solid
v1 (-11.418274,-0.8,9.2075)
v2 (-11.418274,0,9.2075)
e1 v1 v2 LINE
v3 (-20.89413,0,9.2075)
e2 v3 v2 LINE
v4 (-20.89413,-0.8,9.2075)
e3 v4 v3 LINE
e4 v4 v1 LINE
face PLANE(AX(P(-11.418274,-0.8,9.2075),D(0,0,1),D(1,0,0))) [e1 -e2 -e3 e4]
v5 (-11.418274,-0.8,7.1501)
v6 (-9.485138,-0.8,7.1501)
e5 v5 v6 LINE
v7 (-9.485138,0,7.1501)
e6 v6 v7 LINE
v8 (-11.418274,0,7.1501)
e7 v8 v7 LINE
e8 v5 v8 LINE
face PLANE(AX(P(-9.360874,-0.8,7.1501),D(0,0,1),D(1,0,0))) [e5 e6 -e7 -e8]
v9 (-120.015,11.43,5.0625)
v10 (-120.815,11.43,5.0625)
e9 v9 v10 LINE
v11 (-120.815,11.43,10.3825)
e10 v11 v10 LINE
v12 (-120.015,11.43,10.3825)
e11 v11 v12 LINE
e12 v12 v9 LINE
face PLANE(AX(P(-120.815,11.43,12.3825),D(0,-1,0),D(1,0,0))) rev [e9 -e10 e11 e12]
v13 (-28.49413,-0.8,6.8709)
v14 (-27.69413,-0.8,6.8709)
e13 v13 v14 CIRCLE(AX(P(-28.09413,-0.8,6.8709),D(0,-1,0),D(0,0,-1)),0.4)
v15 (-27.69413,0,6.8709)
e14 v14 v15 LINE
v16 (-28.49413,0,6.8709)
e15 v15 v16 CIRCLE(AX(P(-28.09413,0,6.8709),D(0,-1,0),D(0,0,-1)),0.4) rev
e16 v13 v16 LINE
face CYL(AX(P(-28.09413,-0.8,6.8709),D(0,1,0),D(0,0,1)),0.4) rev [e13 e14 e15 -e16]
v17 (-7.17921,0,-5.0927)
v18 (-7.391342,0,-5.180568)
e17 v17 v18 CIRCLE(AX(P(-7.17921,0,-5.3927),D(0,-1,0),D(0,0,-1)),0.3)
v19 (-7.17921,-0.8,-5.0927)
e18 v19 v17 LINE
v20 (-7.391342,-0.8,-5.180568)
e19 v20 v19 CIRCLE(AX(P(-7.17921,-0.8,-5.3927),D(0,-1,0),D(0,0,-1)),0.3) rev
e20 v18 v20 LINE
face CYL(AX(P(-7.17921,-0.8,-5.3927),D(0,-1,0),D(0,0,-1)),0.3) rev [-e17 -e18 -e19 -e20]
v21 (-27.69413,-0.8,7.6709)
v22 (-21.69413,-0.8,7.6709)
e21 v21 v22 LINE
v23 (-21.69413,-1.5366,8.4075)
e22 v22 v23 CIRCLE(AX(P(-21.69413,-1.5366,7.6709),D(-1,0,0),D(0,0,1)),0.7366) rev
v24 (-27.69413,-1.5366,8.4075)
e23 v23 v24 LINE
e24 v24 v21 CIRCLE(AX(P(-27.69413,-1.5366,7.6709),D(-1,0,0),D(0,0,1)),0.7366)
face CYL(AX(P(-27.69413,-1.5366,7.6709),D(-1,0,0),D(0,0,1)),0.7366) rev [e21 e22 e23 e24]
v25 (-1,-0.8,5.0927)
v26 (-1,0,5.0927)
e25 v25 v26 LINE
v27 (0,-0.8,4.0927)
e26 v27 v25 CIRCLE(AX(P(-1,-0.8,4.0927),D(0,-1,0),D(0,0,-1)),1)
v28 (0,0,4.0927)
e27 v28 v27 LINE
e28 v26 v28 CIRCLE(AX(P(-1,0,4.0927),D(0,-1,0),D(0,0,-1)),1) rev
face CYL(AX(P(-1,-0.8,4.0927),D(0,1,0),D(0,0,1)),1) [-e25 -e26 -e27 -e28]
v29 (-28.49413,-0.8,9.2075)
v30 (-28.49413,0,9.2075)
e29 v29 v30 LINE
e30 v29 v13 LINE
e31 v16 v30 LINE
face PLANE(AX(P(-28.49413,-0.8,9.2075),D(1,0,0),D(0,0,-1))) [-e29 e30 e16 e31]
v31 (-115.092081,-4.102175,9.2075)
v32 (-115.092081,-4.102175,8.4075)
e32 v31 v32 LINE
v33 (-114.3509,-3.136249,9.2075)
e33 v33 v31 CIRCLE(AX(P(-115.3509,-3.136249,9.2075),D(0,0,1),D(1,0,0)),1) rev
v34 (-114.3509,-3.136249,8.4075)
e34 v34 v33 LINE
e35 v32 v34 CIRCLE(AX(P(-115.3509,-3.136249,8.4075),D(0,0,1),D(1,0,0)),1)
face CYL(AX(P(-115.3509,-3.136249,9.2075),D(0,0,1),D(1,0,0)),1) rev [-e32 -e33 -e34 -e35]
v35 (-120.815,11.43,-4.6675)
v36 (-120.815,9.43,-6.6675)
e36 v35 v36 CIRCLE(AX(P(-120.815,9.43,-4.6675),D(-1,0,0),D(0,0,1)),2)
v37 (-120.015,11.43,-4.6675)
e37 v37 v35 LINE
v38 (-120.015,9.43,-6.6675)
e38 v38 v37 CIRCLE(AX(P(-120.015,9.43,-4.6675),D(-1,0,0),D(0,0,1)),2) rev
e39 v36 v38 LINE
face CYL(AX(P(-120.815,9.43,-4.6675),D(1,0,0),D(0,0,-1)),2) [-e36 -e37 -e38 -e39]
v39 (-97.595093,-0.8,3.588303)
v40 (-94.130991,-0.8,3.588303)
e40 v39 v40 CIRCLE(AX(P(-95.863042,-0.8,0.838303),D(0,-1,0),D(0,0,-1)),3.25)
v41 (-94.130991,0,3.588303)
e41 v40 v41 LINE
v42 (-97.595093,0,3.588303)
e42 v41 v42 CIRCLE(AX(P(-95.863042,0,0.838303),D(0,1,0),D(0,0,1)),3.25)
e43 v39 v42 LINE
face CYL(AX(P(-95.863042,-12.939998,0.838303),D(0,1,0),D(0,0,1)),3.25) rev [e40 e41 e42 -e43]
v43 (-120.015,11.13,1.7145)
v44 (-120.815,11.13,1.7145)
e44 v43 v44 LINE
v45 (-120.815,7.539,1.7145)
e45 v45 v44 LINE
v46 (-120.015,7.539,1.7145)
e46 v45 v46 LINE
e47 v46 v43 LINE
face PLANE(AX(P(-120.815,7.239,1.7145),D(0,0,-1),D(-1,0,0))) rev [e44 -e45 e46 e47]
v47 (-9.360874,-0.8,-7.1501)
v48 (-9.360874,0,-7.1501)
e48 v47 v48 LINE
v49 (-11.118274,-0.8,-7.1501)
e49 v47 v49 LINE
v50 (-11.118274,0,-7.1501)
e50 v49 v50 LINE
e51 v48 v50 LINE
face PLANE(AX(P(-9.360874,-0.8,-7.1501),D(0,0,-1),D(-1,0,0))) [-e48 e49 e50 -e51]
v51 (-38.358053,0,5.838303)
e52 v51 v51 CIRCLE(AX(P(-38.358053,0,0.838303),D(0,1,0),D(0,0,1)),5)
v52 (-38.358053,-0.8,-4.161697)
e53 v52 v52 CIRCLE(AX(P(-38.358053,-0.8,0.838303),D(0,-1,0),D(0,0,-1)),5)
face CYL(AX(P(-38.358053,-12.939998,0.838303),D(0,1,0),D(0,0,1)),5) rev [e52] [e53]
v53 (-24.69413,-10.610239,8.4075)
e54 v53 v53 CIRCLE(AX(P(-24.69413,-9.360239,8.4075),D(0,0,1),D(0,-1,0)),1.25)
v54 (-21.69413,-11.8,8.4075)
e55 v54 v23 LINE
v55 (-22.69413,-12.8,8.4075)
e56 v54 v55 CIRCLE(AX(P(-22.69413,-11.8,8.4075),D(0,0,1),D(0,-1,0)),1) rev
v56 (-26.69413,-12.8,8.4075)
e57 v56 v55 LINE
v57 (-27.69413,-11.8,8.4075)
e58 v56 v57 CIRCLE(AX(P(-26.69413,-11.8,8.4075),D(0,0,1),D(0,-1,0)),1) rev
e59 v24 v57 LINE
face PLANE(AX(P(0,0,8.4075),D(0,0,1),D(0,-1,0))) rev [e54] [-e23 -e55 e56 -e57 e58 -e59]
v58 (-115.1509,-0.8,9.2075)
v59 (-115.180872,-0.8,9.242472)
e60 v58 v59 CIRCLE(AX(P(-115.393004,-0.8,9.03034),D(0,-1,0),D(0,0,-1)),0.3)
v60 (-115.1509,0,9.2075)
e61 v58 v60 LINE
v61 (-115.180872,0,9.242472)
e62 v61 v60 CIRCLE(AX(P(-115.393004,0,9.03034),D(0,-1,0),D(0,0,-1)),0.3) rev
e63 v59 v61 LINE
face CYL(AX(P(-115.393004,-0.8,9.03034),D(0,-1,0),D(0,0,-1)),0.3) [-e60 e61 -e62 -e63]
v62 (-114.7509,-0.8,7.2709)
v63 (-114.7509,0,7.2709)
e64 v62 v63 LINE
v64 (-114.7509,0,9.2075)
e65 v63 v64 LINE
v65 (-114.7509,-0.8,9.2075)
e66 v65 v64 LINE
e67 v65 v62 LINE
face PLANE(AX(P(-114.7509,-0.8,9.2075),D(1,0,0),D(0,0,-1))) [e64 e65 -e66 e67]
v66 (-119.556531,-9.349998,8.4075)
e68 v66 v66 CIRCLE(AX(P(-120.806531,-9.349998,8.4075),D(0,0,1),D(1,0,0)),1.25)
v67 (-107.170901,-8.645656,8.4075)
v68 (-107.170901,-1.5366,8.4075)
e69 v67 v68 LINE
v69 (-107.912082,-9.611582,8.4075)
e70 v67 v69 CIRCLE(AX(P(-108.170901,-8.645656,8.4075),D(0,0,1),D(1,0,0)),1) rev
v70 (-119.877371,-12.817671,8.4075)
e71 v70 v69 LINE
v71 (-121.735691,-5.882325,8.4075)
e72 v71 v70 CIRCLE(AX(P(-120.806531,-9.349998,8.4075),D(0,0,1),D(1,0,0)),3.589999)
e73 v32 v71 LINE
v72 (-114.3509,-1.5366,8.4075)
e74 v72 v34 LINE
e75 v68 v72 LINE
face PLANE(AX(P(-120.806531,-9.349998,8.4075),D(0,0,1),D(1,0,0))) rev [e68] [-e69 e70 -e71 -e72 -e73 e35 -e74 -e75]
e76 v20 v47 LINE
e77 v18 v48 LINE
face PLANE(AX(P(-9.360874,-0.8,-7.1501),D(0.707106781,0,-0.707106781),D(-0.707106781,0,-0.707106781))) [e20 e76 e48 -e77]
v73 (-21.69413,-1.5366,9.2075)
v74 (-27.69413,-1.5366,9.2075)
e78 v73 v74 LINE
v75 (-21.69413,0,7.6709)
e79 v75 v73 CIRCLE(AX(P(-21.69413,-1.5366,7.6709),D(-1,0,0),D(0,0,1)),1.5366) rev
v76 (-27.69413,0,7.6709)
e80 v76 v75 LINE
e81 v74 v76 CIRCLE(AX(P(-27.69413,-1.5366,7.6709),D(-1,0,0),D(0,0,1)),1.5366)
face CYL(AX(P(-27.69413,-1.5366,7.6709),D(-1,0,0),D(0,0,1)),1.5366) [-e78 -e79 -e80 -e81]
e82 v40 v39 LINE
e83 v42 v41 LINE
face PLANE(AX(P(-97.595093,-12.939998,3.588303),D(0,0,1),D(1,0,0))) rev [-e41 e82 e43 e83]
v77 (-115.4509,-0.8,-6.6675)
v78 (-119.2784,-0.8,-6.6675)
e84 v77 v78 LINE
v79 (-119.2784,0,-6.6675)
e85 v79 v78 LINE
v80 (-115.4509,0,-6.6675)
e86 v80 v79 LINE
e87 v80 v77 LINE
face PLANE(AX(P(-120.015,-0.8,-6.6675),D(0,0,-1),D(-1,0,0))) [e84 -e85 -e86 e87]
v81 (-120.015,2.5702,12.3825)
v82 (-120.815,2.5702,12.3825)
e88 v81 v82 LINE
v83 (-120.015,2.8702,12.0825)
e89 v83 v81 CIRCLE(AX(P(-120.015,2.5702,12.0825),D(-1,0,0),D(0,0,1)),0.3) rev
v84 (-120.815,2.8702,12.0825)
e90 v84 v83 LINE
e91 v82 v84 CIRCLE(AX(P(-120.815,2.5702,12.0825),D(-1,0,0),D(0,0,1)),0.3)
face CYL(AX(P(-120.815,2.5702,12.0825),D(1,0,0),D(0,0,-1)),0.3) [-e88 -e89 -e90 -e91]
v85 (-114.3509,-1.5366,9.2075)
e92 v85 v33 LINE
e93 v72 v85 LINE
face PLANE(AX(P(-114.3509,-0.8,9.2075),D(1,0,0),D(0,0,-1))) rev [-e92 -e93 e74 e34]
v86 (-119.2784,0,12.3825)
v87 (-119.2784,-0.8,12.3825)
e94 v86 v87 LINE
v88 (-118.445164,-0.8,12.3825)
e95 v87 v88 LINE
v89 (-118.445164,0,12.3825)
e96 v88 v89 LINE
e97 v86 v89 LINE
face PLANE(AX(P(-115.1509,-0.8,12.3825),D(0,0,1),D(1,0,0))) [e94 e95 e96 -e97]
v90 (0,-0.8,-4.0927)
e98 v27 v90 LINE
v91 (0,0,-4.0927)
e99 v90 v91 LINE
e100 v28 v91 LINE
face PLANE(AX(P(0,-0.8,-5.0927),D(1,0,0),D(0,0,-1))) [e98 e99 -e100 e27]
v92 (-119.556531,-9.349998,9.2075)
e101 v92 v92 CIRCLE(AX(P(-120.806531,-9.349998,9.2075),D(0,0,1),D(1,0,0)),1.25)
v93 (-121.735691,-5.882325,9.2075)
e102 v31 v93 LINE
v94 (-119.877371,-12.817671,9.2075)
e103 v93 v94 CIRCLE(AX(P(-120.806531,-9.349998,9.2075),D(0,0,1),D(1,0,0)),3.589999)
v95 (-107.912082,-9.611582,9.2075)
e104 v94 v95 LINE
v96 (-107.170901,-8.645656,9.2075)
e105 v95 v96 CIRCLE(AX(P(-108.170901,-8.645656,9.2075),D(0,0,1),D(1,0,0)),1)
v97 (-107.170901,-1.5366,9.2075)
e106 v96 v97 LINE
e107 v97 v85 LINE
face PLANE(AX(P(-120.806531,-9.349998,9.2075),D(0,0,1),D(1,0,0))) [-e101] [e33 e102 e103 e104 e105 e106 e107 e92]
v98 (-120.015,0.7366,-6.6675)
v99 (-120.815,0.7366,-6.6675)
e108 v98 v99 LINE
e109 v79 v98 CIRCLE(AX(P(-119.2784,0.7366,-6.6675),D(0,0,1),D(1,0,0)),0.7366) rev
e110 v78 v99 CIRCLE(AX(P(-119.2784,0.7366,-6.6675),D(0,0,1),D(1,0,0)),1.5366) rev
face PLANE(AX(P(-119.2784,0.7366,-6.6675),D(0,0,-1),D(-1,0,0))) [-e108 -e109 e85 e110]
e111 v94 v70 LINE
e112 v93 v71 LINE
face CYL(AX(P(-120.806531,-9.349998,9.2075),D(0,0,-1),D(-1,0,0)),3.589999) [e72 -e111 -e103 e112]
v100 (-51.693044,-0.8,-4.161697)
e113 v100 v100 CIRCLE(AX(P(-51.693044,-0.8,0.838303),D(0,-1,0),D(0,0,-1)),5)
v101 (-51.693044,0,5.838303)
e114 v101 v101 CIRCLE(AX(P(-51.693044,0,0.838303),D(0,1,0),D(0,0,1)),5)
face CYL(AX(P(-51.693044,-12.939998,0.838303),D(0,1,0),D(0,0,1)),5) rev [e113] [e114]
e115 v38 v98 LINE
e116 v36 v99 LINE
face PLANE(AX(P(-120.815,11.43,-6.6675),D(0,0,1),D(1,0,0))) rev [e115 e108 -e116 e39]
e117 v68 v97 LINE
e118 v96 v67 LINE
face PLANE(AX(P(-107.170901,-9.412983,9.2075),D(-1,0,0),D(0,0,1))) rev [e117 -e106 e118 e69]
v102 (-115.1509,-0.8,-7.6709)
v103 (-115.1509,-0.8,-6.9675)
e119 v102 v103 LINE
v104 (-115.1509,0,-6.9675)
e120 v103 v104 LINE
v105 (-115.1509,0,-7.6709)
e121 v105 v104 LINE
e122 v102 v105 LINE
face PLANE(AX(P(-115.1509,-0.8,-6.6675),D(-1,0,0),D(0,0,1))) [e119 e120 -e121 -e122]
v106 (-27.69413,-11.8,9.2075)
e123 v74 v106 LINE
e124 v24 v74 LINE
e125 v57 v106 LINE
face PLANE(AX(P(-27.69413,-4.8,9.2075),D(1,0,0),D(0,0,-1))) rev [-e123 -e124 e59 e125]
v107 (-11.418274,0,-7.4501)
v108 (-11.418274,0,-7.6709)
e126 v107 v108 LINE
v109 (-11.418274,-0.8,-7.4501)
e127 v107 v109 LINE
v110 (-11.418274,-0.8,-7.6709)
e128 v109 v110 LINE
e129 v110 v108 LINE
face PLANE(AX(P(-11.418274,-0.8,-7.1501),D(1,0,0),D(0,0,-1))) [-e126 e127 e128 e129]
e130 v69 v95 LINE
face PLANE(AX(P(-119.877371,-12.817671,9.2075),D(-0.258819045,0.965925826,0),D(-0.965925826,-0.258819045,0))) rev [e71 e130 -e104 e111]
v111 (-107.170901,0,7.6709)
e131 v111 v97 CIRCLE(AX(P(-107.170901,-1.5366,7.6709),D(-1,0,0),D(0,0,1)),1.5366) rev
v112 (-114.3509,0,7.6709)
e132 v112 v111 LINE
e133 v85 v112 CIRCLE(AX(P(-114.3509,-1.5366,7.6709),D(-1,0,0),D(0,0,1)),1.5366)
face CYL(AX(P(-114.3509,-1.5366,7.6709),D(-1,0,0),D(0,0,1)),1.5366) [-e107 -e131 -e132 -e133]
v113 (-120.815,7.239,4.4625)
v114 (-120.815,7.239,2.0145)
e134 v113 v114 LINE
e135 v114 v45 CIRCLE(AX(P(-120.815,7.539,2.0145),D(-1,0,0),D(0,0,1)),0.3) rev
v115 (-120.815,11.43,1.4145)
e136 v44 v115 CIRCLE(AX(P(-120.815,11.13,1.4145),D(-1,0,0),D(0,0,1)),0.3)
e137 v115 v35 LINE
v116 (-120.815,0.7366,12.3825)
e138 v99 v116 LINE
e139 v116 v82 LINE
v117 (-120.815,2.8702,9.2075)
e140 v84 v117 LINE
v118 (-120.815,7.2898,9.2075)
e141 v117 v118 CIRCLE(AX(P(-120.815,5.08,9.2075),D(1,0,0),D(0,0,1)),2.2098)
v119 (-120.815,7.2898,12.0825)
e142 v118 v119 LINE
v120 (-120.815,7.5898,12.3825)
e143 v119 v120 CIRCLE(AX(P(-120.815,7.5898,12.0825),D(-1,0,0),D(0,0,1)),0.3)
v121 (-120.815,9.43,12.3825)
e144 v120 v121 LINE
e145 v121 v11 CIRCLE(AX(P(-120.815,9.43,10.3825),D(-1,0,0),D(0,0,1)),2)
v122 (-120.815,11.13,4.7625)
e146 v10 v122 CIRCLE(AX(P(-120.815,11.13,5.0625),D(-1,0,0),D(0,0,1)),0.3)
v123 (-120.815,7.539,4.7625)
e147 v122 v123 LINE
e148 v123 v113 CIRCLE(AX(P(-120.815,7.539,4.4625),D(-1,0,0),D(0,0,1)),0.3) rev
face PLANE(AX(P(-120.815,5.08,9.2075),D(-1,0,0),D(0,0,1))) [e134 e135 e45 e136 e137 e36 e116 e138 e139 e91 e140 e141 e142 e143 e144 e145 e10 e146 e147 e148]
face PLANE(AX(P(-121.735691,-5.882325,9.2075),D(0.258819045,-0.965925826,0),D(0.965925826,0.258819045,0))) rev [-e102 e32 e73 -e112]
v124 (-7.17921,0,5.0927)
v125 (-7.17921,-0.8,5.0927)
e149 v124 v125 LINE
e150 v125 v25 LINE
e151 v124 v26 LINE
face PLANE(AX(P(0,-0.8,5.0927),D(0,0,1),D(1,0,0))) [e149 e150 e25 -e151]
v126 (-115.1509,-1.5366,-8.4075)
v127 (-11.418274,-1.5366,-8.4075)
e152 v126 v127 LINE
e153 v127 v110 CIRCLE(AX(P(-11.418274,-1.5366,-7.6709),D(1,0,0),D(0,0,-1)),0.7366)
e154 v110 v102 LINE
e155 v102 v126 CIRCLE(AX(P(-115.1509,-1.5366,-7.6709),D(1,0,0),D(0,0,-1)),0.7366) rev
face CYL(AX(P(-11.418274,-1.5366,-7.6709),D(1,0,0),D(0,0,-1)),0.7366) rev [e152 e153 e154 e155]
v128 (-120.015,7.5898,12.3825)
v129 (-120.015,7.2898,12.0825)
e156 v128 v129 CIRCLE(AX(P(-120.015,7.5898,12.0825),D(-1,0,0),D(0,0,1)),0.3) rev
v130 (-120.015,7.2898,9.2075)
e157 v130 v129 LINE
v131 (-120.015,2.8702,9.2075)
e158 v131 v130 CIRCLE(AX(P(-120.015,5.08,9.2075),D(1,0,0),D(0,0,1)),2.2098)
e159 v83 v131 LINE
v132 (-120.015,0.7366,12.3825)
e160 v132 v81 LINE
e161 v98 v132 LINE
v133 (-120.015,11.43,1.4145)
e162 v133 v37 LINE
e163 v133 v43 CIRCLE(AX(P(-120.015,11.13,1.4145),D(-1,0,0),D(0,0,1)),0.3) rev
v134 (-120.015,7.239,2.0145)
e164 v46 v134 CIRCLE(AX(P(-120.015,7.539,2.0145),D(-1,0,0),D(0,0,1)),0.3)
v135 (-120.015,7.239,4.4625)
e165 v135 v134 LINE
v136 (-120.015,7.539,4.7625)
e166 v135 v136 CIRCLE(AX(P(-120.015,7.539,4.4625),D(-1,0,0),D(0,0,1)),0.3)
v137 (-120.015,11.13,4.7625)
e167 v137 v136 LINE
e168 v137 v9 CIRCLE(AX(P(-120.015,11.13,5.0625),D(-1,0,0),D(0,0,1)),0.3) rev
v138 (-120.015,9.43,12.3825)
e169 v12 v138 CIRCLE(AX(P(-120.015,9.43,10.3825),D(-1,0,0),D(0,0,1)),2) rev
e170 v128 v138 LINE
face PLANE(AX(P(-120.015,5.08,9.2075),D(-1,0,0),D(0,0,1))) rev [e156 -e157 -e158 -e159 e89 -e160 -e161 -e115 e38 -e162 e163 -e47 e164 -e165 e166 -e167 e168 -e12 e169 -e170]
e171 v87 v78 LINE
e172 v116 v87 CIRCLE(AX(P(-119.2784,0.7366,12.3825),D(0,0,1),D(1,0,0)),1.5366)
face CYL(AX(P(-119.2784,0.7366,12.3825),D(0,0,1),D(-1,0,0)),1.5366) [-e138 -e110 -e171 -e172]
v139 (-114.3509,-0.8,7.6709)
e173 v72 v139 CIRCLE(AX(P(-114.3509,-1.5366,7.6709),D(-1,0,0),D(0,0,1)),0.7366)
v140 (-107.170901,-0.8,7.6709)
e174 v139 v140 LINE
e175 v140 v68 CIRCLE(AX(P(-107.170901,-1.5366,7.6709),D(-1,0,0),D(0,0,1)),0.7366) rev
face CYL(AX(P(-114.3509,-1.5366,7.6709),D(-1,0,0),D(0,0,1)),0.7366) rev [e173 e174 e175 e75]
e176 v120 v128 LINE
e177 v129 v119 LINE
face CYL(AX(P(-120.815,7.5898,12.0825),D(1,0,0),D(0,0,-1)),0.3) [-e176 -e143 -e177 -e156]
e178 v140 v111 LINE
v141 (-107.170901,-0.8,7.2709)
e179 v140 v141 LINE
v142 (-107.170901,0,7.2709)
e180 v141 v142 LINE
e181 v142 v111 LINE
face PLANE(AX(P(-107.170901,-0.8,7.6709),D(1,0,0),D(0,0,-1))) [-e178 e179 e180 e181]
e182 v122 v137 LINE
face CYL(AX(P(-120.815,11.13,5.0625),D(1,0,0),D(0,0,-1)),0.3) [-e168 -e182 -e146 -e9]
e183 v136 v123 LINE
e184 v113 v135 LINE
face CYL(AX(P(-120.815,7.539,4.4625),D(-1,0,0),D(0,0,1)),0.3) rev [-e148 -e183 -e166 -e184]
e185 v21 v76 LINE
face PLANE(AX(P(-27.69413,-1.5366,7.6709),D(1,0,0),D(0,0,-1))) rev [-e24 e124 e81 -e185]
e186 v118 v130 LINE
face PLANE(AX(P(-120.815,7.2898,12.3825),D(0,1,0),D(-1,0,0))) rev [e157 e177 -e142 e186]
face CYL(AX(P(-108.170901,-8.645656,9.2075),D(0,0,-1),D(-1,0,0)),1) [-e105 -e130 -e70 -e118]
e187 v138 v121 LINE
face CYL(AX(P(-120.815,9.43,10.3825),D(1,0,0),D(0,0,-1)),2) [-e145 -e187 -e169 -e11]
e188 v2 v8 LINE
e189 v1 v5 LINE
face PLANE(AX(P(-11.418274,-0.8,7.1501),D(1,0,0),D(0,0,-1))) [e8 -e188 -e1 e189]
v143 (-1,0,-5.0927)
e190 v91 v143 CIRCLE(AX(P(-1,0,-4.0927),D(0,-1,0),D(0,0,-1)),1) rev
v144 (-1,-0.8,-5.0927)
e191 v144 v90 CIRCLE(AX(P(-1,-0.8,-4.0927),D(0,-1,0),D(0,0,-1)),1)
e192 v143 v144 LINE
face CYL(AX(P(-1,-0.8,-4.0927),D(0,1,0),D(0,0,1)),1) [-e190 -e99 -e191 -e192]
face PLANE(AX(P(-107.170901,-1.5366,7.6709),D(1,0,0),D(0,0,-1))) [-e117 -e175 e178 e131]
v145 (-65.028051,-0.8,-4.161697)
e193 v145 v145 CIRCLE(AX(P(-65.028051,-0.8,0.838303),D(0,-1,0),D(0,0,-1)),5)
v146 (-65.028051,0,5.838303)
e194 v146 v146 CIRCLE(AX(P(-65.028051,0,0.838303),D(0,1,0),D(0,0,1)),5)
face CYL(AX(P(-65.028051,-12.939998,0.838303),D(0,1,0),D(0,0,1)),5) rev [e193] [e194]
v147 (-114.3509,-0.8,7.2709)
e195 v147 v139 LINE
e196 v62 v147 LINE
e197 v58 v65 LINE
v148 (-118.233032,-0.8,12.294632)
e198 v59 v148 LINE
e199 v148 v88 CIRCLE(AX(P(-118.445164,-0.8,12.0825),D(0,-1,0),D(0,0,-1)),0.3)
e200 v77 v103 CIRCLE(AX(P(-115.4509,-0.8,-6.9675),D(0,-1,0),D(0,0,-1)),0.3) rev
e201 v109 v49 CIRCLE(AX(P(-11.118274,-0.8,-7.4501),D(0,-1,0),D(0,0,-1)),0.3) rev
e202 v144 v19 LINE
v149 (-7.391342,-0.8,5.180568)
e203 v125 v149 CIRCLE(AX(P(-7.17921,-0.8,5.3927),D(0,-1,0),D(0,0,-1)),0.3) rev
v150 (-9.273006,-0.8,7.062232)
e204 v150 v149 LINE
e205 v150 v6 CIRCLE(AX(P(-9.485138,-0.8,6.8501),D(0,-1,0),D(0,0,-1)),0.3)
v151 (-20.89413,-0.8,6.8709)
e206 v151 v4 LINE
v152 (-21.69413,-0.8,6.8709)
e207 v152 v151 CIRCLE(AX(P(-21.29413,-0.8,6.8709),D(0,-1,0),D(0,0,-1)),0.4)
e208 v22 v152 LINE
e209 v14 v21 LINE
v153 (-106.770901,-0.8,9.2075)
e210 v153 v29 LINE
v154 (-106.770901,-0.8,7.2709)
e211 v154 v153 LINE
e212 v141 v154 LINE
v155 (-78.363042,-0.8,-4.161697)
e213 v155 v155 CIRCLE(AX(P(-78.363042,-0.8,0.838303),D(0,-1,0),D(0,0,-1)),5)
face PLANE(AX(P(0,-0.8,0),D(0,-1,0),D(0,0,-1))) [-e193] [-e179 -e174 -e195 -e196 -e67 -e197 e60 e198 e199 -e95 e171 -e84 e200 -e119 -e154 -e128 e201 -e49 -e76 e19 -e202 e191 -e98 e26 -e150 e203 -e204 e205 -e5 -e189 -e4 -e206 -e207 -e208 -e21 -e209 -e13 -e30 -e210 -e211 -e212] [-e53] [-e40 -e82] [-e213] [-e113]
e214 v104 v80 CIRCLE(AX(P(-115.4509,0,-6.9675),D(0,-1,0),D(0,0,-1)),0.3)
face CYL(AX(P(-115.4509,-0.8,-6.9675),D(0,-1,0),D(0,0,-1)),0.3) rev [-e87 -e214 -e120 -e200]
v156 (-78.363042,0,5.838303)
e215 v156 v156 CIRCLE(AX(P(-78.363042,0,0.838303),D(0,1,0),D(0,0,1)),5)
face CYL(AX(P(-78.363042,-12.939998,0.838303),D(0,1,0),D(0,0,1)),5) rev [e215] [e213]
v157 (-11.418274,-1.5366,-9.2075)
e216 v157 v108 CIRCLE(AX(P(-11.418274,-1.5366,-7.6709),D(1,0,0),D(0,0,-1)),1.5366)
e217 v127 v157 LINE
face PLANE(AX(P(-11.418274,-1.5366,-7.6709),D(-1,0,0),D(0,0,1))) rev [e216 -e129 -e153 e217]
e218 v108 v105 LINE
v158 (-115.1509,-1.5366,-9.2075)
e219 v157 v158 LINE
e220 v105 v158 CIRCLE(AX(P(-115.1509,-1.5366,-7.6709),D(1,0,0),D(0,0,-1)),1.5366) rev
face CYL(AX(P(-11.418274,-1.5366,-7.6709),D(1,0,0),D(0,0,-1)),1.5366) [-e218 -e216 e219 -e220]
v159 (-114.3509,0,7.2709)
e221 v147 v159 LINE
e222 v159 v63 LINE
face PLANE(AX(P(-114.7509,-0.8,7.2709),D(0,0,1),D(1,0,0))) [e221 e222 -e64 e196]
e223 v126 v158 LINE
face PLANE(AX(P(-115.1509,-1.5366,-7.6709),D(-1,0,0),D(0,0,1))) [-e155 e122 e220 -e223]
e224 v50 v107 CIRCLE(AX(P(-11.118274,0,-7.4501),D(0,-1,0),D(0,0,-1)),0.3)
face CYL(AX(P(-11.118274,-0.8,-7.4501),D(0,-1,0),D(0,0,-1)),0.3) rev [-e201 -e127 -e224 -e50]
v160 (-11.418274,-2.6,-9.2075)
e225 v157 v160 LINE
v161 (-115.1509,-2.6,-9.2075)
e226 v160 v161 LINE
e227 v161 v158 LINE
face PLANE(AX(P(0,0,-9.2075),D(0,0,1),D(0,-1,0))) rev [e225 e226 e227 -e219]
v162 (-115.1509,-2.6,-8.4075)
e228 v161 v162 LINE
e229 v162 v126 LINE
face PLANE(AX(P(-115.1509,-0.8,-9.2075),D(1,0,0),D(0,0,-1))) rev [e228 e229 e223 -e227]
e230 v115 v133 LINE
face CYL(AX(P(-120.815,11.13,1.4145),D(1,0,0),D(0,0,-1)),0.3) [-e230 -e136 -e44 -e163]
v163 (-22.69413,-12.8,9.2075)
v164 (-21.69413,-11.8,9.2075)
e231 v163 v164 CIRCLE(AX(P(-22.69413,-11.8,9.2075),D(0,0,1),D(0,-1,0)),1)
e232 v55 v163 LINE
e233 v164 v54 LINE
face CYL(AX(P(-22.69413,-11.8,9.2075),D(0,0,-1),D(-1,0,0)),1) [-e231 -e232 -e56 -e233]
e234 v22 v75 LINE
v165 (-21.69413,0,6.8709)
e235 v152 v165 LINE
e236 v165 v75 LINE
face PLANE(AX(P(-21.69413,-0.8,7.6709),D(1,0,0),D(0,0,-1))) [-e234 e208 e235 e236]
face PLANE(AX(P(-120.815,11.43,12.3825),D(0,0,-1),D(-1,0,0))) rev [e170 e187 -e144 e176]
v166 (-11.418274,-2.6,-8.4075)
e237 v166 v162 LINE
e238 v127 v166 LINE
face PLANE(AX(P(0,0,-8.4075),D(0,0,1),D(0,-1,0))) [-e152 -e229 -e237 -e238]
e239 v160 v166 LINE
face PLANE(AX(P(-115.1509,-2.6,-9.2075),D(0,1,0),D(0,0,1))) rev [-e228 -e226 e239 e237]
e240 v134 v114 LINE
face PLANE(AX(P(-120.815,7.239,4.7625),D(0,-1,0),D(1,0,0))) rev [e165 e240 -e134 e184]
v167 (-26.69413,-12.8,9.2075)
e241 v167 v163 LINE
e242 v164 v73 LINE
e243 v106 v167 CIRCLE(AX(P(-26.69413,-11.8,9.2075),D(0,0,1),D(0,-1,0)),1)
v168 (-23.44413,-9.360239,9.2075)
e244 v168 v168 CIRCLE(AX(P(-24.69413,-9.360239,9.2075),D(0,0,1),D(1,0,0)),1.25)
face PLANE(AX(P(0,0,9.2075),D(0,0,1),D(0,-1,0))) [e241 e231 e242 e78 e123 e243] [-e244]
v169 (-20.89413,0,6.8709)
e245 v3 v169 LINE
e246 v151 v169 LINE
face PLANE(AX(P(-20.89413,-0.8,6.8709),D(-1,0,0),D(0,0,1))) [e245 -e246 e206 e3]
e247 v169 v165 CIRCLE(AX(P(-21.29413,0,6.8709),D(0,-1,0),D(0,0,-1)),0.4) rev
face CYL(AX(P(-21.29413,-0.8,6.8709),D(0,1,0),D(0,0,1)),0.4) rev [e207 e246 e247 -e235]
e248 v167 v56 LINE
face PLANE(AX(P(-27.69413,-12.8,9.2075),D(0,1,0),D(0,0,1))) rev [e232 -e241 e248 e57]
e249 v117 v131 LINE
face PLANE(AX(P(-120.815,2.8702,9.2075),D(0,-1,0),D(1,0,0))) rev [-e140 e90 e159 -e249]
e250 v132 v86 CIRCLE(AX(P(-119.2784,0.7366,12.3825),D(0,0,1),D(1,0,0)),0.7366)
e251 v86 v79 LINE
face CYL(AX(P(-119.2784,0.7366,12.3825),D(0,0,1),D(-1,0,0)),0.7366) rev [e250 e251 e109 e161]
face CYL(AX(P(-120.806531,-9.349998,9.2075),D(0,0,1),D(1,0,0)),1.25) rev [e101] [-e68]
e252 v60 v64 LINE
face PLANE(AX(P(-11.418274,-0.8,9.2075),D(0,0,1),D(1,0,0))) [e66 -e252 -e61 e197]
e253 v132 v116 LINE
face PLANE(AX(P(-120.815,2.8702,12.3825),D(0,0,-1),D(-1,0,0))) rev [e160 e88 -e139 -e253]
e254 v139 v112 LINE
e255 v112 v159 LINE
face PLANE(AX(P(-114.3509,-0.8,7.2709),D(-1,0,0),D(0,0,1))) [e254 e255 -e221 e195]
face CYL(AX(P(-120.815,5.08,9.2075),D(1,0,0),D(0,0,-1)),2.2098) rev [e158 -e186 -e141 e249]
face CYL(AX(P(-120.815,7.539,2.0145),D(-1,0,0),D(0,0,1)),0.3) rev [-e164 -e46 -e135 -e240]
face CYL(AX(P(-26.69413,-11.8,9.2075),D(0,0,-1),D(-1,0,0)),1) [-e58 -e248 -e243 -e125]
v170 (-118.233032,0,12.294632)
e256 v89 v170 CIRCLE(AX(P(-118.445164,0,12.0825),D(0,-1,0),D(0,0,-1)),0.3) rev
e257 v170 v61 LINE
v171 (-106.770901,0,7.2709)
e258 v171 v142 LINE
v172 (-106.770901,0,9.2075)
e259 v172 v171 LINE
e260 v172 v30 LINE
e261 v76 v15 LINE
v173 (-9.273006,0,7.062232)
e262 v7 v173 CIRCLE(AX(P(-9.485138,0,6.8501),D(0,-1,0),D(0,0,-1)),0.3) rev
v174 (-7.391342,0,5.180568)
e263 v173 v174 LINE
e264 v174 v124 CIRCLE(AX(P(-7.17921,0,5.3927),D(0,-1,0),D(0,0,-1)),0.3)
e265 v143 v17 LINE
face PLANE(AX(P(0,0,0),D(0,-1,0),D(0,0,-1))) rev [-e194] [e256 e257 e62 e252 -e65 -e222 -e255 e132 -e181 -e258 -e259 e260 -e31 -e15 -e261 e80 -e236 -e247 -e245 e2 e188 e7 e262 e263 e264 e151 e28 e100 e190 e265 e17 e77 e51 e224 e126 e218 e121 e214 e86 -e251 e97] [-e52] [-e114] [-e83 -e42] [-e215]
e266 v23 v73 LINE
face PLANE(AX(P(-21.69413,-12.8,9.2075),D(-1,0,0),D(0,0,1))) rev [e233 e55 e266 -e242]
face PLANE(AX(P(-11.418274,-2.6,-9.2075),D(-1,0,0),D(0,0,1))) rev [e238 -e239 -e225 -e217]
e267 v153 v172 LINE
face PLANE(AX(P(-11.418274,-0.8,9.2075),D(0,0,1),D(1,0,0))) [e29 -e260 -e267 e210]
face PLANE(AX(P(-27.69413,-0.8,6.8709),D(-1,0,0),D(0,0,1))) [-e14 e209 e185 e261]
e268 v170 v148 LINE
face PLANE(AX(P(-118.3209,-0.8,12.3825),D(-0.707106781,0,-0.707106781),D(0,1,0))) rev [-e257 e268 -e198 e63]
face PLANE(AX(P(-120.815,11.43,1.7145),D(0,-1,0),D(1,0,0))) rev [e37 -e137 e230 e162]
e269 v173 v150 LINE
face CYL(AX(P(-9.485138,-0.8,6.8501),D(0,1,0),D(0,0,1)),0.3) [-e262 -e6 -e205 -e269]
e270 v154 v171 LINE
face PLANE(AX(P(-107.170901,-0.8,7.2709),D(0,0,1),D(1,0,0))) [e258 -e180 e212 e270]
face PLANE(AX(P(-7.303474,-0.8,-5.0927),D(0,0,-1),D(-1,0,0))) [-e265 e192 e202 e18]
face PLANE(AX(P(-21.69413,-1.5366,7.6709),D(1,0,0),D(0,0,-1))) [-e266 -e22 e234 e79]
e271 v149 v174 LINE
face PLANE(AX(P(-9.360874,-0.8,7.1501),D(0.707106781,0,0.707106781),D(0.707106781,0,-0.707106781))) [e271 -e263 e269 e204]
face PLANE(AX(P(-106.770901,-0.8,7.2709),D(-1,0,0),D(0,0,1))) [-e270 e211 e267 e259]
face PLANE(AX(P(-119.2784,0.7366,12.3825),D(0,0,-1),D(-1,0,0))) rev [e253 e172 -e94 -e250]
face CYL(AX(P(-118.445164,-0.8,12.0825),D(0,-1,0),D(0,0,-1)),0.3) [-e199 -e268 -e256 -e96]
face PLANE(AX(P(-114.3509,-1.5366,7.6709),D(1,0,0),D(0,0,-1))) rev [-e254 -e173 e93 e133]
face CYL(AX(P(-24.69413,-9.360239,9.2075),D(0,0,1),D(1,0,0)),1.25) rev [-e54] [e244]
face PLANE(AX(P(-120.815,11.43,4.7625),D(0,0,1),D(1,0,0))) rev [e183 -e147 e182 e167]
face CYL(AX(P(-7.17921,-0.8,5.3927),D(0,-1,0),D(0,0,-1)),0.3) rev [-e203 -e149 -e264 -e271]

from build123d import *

# Parameters (mm, degrees)
BASE_FLANGE1_DEPTH            = 0.8
EDGE_FLANGE1_STRIP_W          = 4.6732
EDGE_FLANGE1_STRIP_H          = 0.8
EDGE_FLANGE1_STRIP_CUT_DEPTH  = 19.05
EDGE_FLANGE1_DEPTH            = 19.05
EDGE_FLANGE1_START            = 0.8
EDGE_FLANGE1_FLAT_DEPTH       = 0.8
CHAMFER2_SIZE                 = 3.17
EDGE_FLANGE2_START            = -1.5366
EDGE_FLANGE2_DEPTH            = 2.5366
EDGE_FLANGE2_START_2          = -0.084496
EDGE_FLANGE2_2_OUTLINE_W      = 6
EDGE_FLANGE2_2_OUTLINE_H      = 0.8
EDGE_FLANGE2_2_DEPTH          = 1.084496
EDGE_FLANGE2_START_3          = -12.8
EDGE_FLANGE2_3_OUTLINE_W      = 6
EDGE_FLANGE2_3_OUTLINE_H      = 0.8
EDGE_FLANGE2_3_DEPTH          = 11.2634
EDGE_FLANGE2_START_4          = -27.694130054
EDGE_FLANGE2_4_DEPTH          = 6
EDGE_FLANGE2_5_DEPTH          = 6
EDGE_FLANGE4_STRIP_W          = 4.6732
EDGE_FLANGE4_STRIP_H          = 0.8
EDGE_FLANGE4_STRIP_CUT_DEPTH  = 7.17999872
EDGE_FLANGE4_RELIEF_W         = 5.0732
EDGE_FLANGE4_RELIEF_H         = 0.4
EDGE_FLANGE4_RELIEF_CUT_DEPTH = 0.8
EDGE_FLANGE4_DEPTH            = 7.17999872
EDGE_FLANGE4_FLAT_DEPTH       = 0.8
M3X0_5_TAPPED_HOLE1_D         = 2.5
EDGE_FLANGE3_STRIP_W          = 4.6732
EDGE_FLANGE3_STRIP_H          = 0.8
EDGE_FLANGE3_STRIP_CUT_DEPTH  = 103.732625794
EDGE_FLANGE3_DEPTH            = 103.732625794
SKETCH21_R                    = 5
CUT_EXTRUDE1_DEPTH            = 126.679221242
FILLET1_R                     = 1
FILLET3_R                     = 2
FILLET4_R                     = 0.3
FILLET5_R                     = 1


with BuildPart() as part:
    # Base-Flange1: sheet metal written as solids
    # Sketch2 → Base-Flange1 (new body)
    with BuildSketch(Plane(origin=(0, 0, 0), x_dir=(1, 0, 0), z_dir=(0, 1, 0))):
        Polygon((-115.1509, -12.3825), (-120.015, -12.3825), (-120.015, 6.6675), (-115.1509, 6.6675), (-115.1509, 9.2075), (-11.418274206, 9.2075), (-11.418274206, 7.1501), (-9.360874206, 7.1501), (-7.303474206, 5.0927), (0, 5.0927), (0, -5.0927), (-7.303474206, -5.0927), (-9.360874206, -7.1501), (-11.418274206, -7.1501), (-11.418274206, -9.2075), (-115.1509, -9.2075), align=None)
    extrude(amount=-BASE_FLANGE1_DEPTH)

    # Edge-Flange1: sheet metal written as solids
    # Edge-Flange1 strip (on a plane across the edge) → Edge-Flange1 strip cut (cut)
    with BuildSketch(Plane(origin=(-120.015, 0, -6.6675), x_dir=(1, 0, 0), z_dir=(0, 0, 1))):
        with Locations((-1.6, -0.4)):
            Rectangle(EDGE_FLANGE1_STRIP_W, EDGE_FLANGE1_STRIP_H)
    extrude(amount=EDGE_FLANGE1_STRIP_CUT_DEPTH, mode=Mode.SUBTRACT)

    # Edge-Flange1 bend section (on a plane across the edge) → Edge-Flange1 (add)
    with BuildSketch(Plane(origin=(-120.015, 0, -6.6675), x_dir=(1, 0, 0), z_dir=(0, 0, 1))):
        with BuildLine():
            Line((-0.8, 0.7366), (0, 0.7366))
            ThreePointArc((0, 0.7366), (0.215745145, 0.215745145), (0.7366, 0))
            Line((0.7366, 0), (0.7366, -0.8))
            ThreePointArc((0.7366, -0.8), (-0.34994028, -0.34994028), (-0.8, 0.7366))
        make_face()
    extrude(amount=EDGE_FLANGE1_DEPTH)

    # Edge-Flange1 profile (on flange) → Edge-Flange1 flat (add)
    with BuildSketch(Plane.ZY.offset(120.015).offset(EDGE_FLANGE1_START)):
        with BuildLine():
            ThreePointArc((9.2075, 2.8702), (6.9977, 5.08), (9.2075, 7.2898))
            Line((9.2075, 7.2898), (12.3825, 7.2898))
            Line((12.3825, 7.2898), (12.3825, 11.43))
            Line((12.3825, 11.43), (4.7625, 11.43))
            Line((4.7625, 11.43), (4.7625, 7.239))
            Line((4.7625, 7.239), (1.7145, 7.239))
            Line((1.7145, 7.239), (1.7145, 11.43))
            Line((1.7145, 11.43), (-6.6675, 11.43))
            Line((-6.6675, 11.43), (-6.6675, 0.7366))
            Line((-6.6675, 0.7366), (12.3825, 0.7366))
            Line((12.3825, 0.7366), (12.3825, 2.8702))
            Line((12.3825, 2.8702), (9.2075, 2.8702))
        make_face()
    extrude(amount=-EDGE_FLANGE1_FLAT_DEPTH)

    # Chamfer2
    chamfer2_edges = [part.edges().sort_by_distance(p)[0] for p in [
        (-115.1509, -0.4, 12.3825),
    ]]
    chamfer(chamfer2_edges, length=CHAMFER2_SIZE)

    # Edge-Flange2: read off the stored shape, not the designer's step
    # Edge-Flange2 outline → Edge-Flange2 (cut)
    with BuildSketch(Plane(origin=(0, 0, 0), x_dir=(1, 0, 0), z_dir=(0, 1, 0)).offset(EDGE_FLANGE2_START)):
        with BuildLine():
            Line((-28.494130054, -9.2075), (-27.694130054, -9.2075))
            Line((-27.694130054, -9.2075), (-27.694130054, -6.8709))
            ThreePointArc((-27.694130054, -6.8709), (-28.094130054, -6.4709), (-28.494130054, -6.8709))
            Line((-28.494130054, -6.8709), (-28.494130054, -9.2075))
        make_face()
        with BuildLine():
            Line((-21.694130054, -6.8709), (-21.694130054, -9.2075))
            Line((-21.694130054, -9.2075), (-20.894130054, -9.2075))
            Line((-20.894130054, -9.2075), (-20.894130054, -6.8709))
            ThreePointArc((-20.894130054, -6.8709), (-21.294130054, -6.4709), (-21.694130054, -6.8709))
        make_face()
    extrude(amount=EDGE_FLANGE2_DEPTH, mode=Mode.SUBTRACT)

    # Edge-Flange2 2 outline → Edge-Flange2 2 (cut)
    with BuildSketch(Plane(origin=(0, 0, 0), x_dir=(1, 0, 0), z_dir=(0, 1, 0)).offset(EDGE_FLANGE2_START_2)):
        with Locations((-24.694130054, -8.8075)):
            Rectangle(EDGE_FLANGE2_2_OUTLINE_W, EDGE_FLANGE2_2_OUTLINE_H)
    extrude(amount=EDGE_FLANGE2_2_DEPTH, mode=Mode.SUBTRACT)

    # Edge-Flange2 4 outline → Edge-Flange2 4 (cut)
    with BuildSketch(Plane.YZ.offset(EDGE_FLANGE2_START_4)):
        with BuildLine():
            Line((-0.8, 9.2075), (-0.8, 9.019439951))
            ThreePointArc((-0.8, 9.019439951), (-0.215048049, 8.454889796), (0, 7.6709))
            Line((0, 7.6709), (0, 8.4075))
            Line((0, 8.4075), (-0.084496, 8.4075))
            Line((-0.084496, 8.4075), (-0.084496, 9.2075))
            Line((-0.084496, 9.2075), (-0.8, 9.2075))
        make_face()
    extrude(amount=EDGE_FLANGE2_4_DEPTH, mode=Mode.SUBTRACT)



with BuildPart() as body_2:
    # Edge-Flange2 3 outline → Edge-Flange2 3 (new body)
    with BuildSketch(Plane(origin=(0, 0, 0), x_dir=(1, 0, 0), z_dir=(0, 1, 0)).offset(EDGE_FLANGE2_START_3)):
        with Locations((-24.694130054, -8.8075)):
            Rectangle(EDGE_FLANGE2_3_OUTLINE_W, EDGE_FLANGE2_3_OUTLINE_H)
    extrude(amount=EDGE_FLANGE2_3_DEPTH)


with BuildPart() as part_1:
    add(part.part)

    add(body_2.part)  # Edge-Flange2 5 merges body 2
    # Edge-Flange2 5 outline → Edge-Flange2 5 (add)
    with BuildSketch(Plane.YZ.offset(EDGE_FLANGE2_START_4)):
        with BuildLine():
            ThreePointArc((-0.8, 9.019439951), (-1.156486155, 9.159742848), (-1.5366, 9.2075))
            Line((-1.5366, 9.2075), (-1.5366, 8.4075))
            ThreePointArc((-1.5366, 8.4075), (-1.015745145, 8.191754855), (-0.8, 7.6709))
            Line((-0.8, 7.6709), (-0.8, 9.019439951))
        make_face()
    extrude(amount=EDGE_FLANGE2_5_DEPTH)

    # Edge-Flange4: sheet metal written as solids
    # Edge-Flange4 strip (on a plane across the edge) → Edge-Flange4 strip cut (cut)
    with BuildSketch(Plane(origin=(-107.17090128, -0.8, 9.2075), x_dir=(0, 0, -1), z_dir=(-1, 0, 0))):
        with Locations((-0.8, -0.4)):
            Rectangle(EDGE_FLANGE4_STRIP_W, EDGE_FLANGE4_STRIP_H)
    extrude(amount=EDGE_FLANGE4_STRIP_CUT_DEPTH, mode=Mode.SUBTRACT)

    # Edge-Flange4 relief (on the sheet) → Edge-Flange4 relief cut (cut)
    with BuildSketch(Plane(origin=(-107.17090128, -0.8, 7.6709), x_dir=(0, 0, -1), z_dir=(0, -1, 0))):
        with Locations((-2.1366, 0.2)):
            Rectangle(EDGE_FLANGE4_RELIEF_W, EDGE_FLANGE4_RELIEF_H)
        with Locations((-2.1366, -7.37999872)):
            Rectangle(EDGE_FLANGE4_RELIEF_W, EDGE_FLANGE4_RELIEF_H)
    extrude(amount=-EDGE_FLANGE4_RELIEF_CUT_DEPTH, mode=Mode.SUBTRACT)

    # Edge-Flange4 bend section (on a plane across the edge) → Edge-Flange4 (add)
    with BuildSketch(Plane(origin=(-107.17090128, -0.8, 9.2075), x_dir=(0, 0, -1), z_dir=(-1, 0, 0))):
        with BuildLine():
            Line((0, 0.7366), (0.8, 0.7366))
            ThreePointArc((0.8, 0.7366), (1.015745145, 0.215745145), (1.5366, 0))
            Line((1.5366, 0), (1.5366, -0.8))
            ThreePointArc((1.5366, -0.8), (0.45005972, -0.34994028), (0, 0.7366))
        make_face()
    extrude(amount=EDGE_FLANGE4_DEPTH)

    # Edge-Flange4 profile (on flange) → Edge-Flange4 flat (add)
    with BuildSketch(Plane(origin=(0, -0.8, 9.2075), x_dir=(-1, 0, 0), z_dir=(0, 0, 1))):
        with BuildLine():
            ThreePointArc((121.735691381, 5.082325102), (124.274204272, 9.479158406), (119.877370968, 12.017671298))
            Line((119.877370968, 12.017671298), (107.17090128, 8.612983007))
            Line((107.17090128, 8.612983007), (107.17090128, 0.7366))
            Line((107.17090128, 0.7366), (114.3509, 0.7366))
            Line((114.3509, 0.7366), (114.3509, 3.103576215))
            Line((114.3509, 3.103576215), (121.735691381, 5.082325102))
        make_face()
    extrude(amount=-EDGE_FLANGE4_FLAT_DEPTH)

    # M3x0.5 Tapped Hole1 (through all)
    with Locations(Plane.XY.offset(9.2075)):
        with Locations((-120.806531174, -9.3499982), (-24.694130054, -9.36023907)):
            Hole(M3X0_5_TAPPED_HOLE1_D / 2)

    # Edge-Flange3: sheet metal written as solids
    # Edge-Flange3 strip (on a plane across the edge) → Edge-Flange3 strip cut (cut)
    with BuildSketch(Plane(origin=(-115.1509, -0.8, -9.2075), x_dir=(0, 0, 1), z_dir=(1, 0, 0))):
        with Locations((-0.8, -0.4)):
            Rectangle(EDGE_FLANGE3_STRIP_W, EDGE_FLANGE3_STRIP_H)
    extrude(amount=EDGE_FLANGE3_STRIP_CUT_DEPTH, mode=Mode.SUBTRACT)

    # Edge-Flange3 section (on a plane across the edge) → Edge-Flange3 (add)
    with BuildSketch(Plane(origin=(-115.1509, -0.8, -9.2075), x_dir=(0, 0, 1), z_dir=(1, 0, 0))):
        with BuildLine():
            Line((0, 0.7366), (0, 1.8))
            Line((0, 1.8), (0.8, 1.8))
            Line((0.8, 1.8), (0.8, 0.7366))
            ThreePointArc((0.8, 0.7366), (1.015745145, 0.215745145), (1.5366, 0))
            Line((1.5366, 0), (1.5366, -0.8))
            ThreePointArc((1.5366, -0.8), (0.45005972, -0.34994028), (0, 0.7366))
        make_face()
    extrude(amount=EDGE_FLANGE3_DEPTH)

    # Sketch21 → Cut-Extrude1 (cut, through all)
    with BuildSketch(Plane(origin=(0, 0, 0), x_dir=(1, 0, 0), z_dir=(0, 1, 0))):
        with Locations(Location((-78.363042127, -0.838303057, 0), (0, 0, 270))):
            Circle(SKETCH21_R)
        with Locations(Location((-65.028050672, -0.838303057, 0), (0, 0, 270))):
            Circle(SKETCH21_R)
        with Locations(Location((-51.693043958, -0.838303057, 0), (0, 0, 270))):
            Circle(SKETCH21_R)
        with Locations(Location((-38.358052503, -0.838303057, 0), (0, 0, 270))):
            Circle(SKETCH21_R)
        with BuildLine():
            Line((-97.595092935, -3.588303057), (-94.13099132, -3.588303057))
            ThreePointArc((-94.13099132, -3.588303057), (-95.863042127, 2.411696943), (-97.595092935, -3.588303057))
        make_face()
    extrude(amount=-CUT_EXTRUDE1_DEPTH, mode=Mode.SUBTRACT)

    # Fillet1
    fillet1_edges = [part_1.edges().sort_by_distance(p)[0] for p in [
        (0, -0.4, -5.0927),
        (0, -0.4, 5.0927),
    ]]
    fillet(fillet1_edges, radius=FILLET1_R)

    # Fillet3
    fillet3_edges = [part_1.edges().sort_by_distance(p)[0] for p in [
        (-120.415, 11.43, -6.6675),
        (-120.415, 11.43, 12.3825),
    ]]
    fillet(fillet3_edges, radius=FILLET3_R)

    # Fillet4
    # the kernel refuses this fillet: 0.3 mm, written as the material it adds along each edge
    with BuildSketch(Plane(origin=(-115.1509, 0, -6.6675), x_dir=(-1, 0, 0), z_dir=(0, -1, 0))) as fillet4_piece_1:
        with BuildLine():
            CenterArc((FILLET4_R, FILLET4_R), FILLET4_R, 180, 90)
            Line((0, FILLET4_R), (0, 0))
            Line((0, 0), (FILLET4_R, 0))
        make_face()
    extrude(amount=0.8)
    with BuildSketch(Plane(origin=(-11.418274206, 0, -7.1501), x_dir=(1, 0, 0), z_dir=(0, -1, 0)), Plane(origin=(-120.815, 7.239, 4.7625), x_dir=(0, 1, 0), z_dir=(1, 0, 0)), Plane(origin=(-120.815, 7.239, 1.7145), x_dir=(0, 0, 1), z_dir=(1, 0, 0))) as fillet4_piece_2:
        with BuildLine():
            CenterArc((FILLET4_R, -FILLET4_R), FILLET4_R, 90, 90)
            Line((0, -FILLET4_R), (0, 0))
            Line((0, 0), (FILLET4_R, 0))
        make_face()
    extrude(amount=0.8)
    with BuildSketch(Plane(origin=(-7.303474206, 0, -5.0927), x_dir=(1, 0, 0), z_dir=(0, -1, 0))) as fillet4_piece_3:
        with BuildLine():
            CenterArc((FILLET4_R * 0.414213562373, -FILLET4_R), FILLET4_R, 90, 45)
            Line((-FILLET4_R * 0.292893218813, -FILLET4_R * 0.292893218813), (0, 0))
            Line((0, 0), (FILLET4_R * 0.414213562373, 0))
        make_face()
    extrude(amount=0.8)
    with BuildSketch(Plane(origin=(-7.303474206, 0, 5.0927), x_dir=(1, 0, 0), z_dir=(0, -1, 0))) as fillet4_piece_4:
        with BuildLine():
            CenterArc((FILLET4_R * 0.414213562373, FILLET4_R), FILLET4_R, 225, 45)
            Line((-FILLET4_R * 0.292893218813, FILLET4_R * 0.292893218813), (0, 0))
            Line((0, 0), (FILLET4_R * 0.414213562373, 0))
        make_face()
    extrude(amount=0.8)
    # the kernel refuses this fillet: 0.3 mm, written as the material it takes off along each edge
    with BuildSketch(Plane(origin=(-115.1509, 0.1059659, 9.2125), x_dir=(-0.7071067811864428, 0, 0.7071067811866523), z_dir=(0, -1, 0))) as fillet4_2_piece_1:
        with BuildLine():
            CenterArc((0.04238636, 0.3), FILLET4_R, 261.194947533, 8.805052467)
            Line((-0.003535534, 0.003535534), (0, 0))
            Line((0, 0), (0.04238636, 0))
        make_face()
    extrude(amount=1.0119318, mode=Mode.SUBTRACT)
    with BuildSketch(Plane(origin=(-9.360874206, 0.310660172, 7.1501), x_dir=(-1, 0, 0), z_dir=(0, -1, 0)), Plane(origin=(-118.3209, 0.310660172, 12.3825), x_dir=(-1, 0, 0), z_dir=(0, -1, 0))) as fillet4_2_piece_2:
        with BuildLine():
            CenterArc((FILLET4_R * 0.414213562373, FILLET4_R), FILLET4_R, 225, 45)
            Line((-FILLET4_R * 0.292893218813, FILLET4_R * 0.292893218813), (0, 0))
            Line((0, 0), (FILLET4_R * 0.414213562373, 0))
        make_face()
    extrude(amount=1.421320344, mode=Mode.SUBTRACT)
    with BuildSketch(Plane(origin=(-121.565, 2.8702, 12.3825), x_dir=(0, 0, -1), z_dir=(1, 0, 0)), Plane(origin=(-121.565, 7.2898, 12.3825), x_dir=(0, 1, 0), z_dir=(1, 0, 0)), Plane(origin=(-121.565, 11.43, 4.7625), x_dir=(0, -1, 0), z_dir=(1, 0, 0)), Plane(origin=(-121.565, 11.43, 1.7145), x_dir=(0, 0, -1), z_dir=(1, 0, 0))) as fillet4_2_piece_3:
        with BuildLine():
            CenterArc((FILLET4_R, -FILLET4_R), FILLET4_R, 90, 90)
            Line((0, -FILLET4_R), (0, 0))
            Line((0, 0), (FILLET4_R, 0))
        make_face()
    extrude(amount=2.3, mode=Mode.SUBTRACT)

    # Fillet5
    fillet5_edges = [part_1.edges().sort_by_distance(p)[0] for p in [
        (-21.694130054, -12.8, 8.8075),
        (-27.694130054, -12.8, 8.8075),
        (-107.17090128, -9.412983007, 8.8075),
        (-114.3509, -3.903576215, 8.8075),
    ]]
    fillet(fillet5_edges, radius=FILLET5_R)


solid = part_1.part
